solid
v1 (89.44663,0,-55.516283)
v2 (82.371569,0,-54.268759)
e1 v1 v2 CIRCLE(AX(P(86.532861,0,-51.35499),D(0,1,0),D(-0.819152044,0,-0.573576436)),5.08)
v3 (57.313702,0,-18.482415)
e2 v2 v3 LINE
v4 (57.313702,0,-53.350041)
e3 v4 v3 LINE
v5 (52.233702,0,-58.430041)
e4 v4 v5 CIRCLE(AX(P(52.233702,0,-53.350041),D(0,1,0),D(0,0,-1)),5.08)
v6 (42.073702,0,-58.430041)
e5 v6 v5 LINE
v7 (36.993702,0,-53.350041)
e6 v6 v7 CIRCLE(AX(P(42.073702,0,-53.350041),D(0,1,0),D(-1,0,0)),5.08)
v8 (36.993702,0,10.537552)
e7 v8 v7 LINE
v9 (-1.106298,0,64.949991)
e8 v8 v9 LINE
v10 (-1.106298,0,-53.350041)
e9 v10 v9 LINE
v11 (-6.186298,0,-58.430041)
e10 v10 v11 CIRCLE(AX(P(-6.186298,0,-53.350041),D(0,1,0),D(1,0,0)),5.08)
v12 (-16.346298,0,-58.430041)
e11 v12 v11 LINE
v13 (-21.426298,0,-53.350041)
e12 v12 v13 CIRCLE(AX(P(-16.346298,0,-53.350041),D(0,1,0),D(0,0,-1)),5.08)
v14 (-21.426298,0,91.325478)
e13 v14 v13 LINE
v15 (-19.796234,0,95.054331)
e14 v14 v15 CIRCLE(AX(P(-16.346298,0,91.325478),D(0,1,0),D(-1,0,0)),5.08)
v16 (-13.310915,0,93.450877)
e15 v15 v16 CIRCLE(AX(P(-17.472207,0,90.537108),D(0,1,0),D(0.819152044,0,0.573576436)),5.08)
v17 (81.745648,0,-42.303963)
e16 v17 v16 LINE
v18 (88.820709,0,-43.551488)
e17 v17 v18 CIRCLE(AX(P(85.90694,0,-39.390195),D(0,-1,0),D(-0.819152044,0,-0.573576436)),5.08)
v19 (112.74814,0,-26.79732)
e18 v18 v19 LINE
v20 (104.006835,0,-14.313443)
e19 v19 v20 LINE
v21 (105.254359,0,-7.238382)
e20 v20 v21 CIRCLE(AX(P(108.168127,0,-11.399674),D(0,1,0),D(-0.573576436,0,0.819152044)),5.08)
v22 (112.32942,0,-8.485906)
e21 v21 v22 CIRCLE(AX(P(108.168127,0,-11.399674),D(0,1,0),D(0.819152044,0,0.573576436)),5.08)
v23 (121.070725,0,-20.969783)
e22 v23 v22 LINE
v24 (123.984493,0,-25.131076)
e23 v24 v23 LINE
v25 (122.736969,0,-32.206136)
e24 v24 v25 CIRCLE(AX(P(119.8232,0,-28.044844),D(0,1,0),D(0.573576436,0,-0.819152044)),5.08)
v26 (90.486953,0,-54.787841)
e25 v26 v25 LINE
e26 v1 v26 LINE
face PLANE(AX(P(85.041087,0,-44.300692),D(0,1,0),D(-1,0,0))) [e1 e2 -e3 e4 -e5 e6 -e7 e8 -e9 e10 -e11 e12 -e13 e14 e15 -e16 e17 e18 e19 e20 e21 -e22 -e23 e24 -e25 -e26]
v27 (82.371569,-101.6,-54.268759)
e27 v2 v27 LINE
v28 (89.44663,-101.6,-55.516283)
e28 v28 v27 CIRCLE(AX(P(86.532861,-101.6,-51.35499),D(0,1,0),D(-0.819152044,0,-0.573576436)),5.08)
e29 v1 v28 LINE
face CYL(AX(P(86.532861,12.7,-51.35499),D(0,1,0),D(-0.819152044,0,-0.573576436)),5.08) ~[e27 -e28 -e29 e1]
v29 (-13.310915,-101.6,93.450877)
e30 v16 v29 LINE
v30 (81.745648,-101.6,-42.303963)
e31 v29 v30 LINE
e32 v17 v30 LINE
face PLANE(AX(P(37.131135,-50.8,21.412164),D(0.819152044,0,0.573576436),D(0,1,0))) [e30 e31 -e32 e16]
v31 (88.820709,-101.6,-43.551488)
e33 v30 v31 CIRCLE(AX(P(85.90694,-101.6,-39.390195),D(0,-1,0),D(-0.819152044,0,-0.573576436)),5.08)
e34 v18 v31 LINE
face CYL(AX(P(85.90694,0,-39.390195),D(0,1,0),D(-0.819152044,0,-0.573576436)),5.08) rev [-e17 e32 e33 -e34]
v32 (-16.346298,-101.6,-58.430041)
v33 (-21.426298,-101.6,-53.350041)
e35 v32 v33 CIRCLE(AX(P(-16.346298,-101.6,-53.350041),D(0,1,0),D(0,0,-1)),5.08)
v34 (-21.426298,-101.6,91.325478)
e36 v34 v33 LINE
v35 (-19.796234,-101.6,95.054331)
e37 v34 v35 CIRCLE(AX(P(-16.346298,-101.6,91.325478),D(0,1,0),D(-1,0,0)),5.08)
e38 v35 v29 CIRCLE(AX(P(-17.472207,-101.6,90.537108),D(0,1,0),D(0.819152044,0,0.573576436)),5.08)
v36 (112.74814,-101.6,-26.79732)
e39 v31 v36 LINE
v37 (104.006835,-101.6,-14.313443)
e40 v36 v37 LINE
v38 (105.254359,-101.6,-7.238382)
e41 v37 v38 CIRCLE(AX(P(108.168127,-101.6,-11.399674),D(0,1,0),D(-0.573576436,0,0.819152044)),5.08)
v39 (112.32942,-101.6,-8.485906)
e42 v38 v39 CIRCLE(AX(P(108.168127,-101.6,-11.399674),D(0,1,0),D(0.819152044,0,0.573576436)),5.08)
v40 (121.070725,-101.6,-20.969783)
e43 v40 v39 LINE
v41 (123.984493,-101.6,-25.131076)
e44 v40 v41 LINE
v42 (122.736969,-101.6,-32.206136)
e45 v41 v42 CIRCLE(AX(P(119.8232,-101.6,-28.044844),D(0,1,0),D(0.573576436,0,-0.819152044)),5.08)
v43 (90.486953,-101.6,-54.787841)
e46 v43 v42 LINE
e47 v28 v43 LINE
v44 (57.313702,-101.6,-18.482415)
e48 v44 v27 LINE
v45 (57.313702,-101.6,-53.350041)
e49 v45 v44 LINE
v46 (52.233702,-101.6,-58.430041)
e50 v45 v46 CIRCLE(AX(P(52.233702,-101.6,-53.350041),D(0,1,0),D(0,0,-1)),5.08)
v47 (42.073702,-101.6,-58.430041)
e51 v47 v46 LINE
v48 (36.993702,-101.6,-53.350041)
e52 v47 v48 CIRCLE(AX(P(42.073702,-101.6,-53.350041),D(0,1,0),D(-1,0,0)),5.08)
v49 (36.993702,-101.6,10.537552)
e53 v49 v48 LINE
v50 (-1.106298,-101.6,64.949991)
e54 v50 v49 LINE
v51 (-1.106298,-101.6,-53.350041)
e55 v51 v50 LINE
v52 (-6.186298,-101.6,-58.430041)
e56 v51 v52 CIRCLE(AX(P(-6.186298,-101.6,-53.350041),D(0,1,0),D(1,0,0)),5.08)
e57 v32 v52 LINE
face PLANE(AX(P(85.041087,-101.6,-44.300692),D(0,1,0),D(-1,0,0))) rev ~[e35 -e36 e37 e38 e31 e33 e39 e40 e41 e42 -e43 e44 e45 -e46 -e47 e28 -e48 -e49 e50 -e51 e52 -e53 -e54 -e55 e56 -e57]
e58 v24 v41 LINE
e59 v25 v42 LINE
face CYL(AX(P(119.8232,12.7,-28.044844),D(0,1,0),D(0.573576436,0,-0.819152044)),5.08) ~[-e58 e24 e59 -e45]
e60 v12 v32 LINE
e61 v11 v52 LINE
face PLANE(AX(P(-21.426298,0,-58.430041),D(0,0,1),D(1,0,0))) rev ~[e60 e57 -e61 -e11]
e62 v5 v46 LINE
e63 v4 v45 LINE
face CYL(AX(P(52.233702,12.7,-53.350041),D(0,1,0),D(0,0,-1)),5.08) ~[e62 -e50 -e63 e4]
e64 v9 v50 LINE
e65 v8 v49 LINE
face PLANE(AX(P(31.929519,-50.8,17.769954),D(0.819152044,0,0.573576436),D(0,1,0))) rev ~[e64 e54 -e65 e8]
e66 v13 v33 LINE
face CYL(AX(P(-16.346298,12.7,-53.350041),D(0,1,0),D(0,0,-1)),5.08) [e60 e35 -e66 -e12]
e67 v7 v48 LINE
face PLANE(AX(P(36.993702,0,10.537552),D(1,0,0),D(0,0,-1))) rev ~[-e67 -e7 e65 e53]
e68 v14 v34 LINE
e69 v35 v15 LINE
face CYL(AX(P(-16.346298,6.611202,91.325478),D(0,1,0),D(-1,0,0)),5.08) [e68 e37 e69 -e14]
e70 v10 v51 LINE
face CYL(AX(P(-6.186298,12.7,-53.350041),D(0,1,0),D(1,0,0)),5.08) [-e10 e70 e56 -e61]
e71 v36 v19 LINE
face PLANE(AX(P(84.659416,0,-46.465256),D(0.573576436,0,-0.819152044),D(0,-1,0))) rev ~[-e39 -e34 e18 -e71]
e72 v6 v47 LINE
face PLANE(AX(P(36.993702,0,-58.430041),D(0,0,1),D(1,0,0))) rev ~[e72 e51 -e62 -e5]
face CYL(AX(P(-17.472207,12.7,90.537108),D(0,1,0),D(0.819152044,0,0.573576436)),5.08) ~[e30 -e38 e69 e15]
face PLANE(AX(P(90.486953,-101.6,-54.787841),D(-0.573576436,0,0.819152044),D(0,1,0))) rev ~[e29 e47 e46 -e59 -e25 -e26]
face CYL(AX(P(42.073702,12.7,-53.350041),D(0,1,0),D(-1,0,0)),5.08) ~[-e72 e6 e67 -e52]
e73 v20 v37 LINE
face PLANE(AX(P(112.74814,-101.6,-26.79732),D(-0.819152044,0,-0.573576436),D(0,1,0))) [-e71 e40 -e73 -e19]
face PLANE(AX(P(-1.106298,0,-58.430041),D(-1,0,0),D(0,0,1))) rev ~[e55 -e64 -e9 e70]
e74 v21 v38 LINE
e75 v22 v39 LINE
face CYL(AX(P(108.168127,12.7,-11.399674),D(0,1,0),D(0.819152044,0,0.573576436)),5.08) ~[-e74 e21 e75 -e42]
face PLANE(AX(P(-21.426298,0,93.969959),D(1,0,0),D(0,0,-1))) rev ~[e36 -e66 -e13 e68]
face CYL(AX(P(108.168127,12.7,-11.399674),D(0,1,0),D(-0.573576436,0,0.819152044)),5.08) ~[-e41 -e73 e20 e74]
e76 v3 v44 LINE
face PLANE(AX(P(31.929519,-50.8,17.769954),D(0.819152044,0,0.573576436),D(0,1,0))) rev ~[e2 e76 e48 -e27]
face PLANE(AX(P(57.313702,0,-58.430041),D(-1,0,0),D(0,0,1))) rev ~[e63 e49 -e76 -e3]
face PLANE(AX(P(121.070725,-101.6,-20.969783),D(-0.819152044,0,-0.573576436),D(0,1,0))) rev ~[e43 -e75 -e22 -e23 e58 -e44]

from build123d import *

# Parameters (mm, degrees)
F1_DEPTH    = 101.6
F3_DEPTH    = 6.35
F5_DEPTH    = 44.45
F6_W        = 10.16
F6_H        = 101.6
F7_DEPTH    = 20.32
F8_T1_DEPTH = 101.6
F8_T3_DEPTH = 127
F8_T5_DEPTH = 114.822403084
F10_W       = 251.0453239083
F10_H       = 203.9344906807
F11_DEPTH   = 160.782


# Not quite as in the source:
# - a fillet or chamfer that OpenCascade refuses, or shapes differently, is made with other operations: its cross-section is extruded or revolved along the edge and cut away or added


with BuildPart() as f1:
    # F0 (on Front) → F1 (new body)
    with BuildSketch(Plane.XZ):
        Polygon((57.3137016242, -18.4824153282), (36.9937016242, 10.5375521688), (36.9937016242, -58.4300412773), (57.3137016242, -58.4300412773), align=None)
    extrude(amount=F1_DEPTH)



with BuildPart() as f1b:
    # F0 (on Front) → F1, piece 2 (new body)
    with BuildSketch(Plane.XZ):
        Polygon((-1.1062983758, 64.9499912257), (-21.4262983758, 93.9699587227), (-21.4262983758, -58.4300412773), (-1.1062983758, -58.4300412773), align=None)
    extrude(amount=F1_DEPTH)


with BuildPart() as f1_1:
    add(f1.part)

    add(f1b.part)  # F3 merges F1b
    # F2 (on face) → F3 (join)
    with BuildSketch(Plane(origin=(29.774176385, 0, 20.8481027487), x_dir=(0, 1, 0), z_dir=(0.8191520443, 0, 0.5735764364))):
        Polygon((-101.6, 89.265303656), (-101.6, -96.780755544), (0, -96.780755544), (0, 38.465303656), (0, 89.265303656), align=None)
    extrude(amount=F3_DEPTH)

    # F4 (on face) → F5 (join)
    with BuildSketch(Plane(origin=(34.9757918662, 0, 24.4903131196), x_dir=(0, 1, 0), z_dir=(0.8191520443, 0, 0.5735764364))):
        Polygon((-101.6, -86.620755544), (-101.6, -96.780755544), (0, -96.780755544), (0, -86.620755544), (-12.7, -86.620755544), (-88.9, -86.620755544), align=None)
    extrude(amount=F5_DEPTH)

    # F6 (on face) → F7 (join)
    with BuildSketch(Plane(origin=(49.6836242789, 0, -70.9555689817), x_dir=(0.8191520443, 0, 0.5735764364), z_dir=(-0.5735764364, 0, 0.8191520443))):
        with Locations((82.0675579321, -50.8)):
            Rectangle(F6_W, F6_H)
    extrude(amount=F7_DEPTH)

    # F8: fillet of radius 5.08 on 11 edges, made by hand

    # F8_s2 → F8_t1 (join)
    with BuildSketch(Plane.XZ):
        with BuildLine():
            ThreePointArc((81.7456478485, -42.3039634771), (85.0248074909, -44.3930185658), (88.8207085301, -43.5514875655))
            Line((88.8207085301, -43.5514875655), (84.6594161452, -46.4652558621))
            Line((84.6594161452, -46.4652558621), (81.7456478485, -42.3039634771))
        make_face()
    extrude(amount=F8_T1_DEPTH)

    # F8_s4 → F8_t3 (cut)
    with BuildSketch(Plane.XZ.offset(-12.7)):
        with BuildLine():
            ThreePointArc((112.3294196238, -8.4859061114), (109.0502599814, -6.3968510227), (105.2543589422, -7.238382023))
            Line((105.2543589422, -7.238382023), (109.4156513272, -4.3246137264))
            Line((109.4156513272, -4.3246137264), (112.3294196238, -8.4859061114))
        make_face()
        with BuildLine():
            ThreePointArc((122.7369687221, -32.206136333), (124.8260238108, -28.9269766905), (123.9844928105, -25.1310756513))
            Line((123.9844928105, -25.1310756513), (126.8982611071, -29.2923680363))
            Line((126.8982611071, -29.2923680363), (122.7369687221, -32.206136333))
        make_face()
        with BuildLine():
            ThreePointArc((105.2543589422, -7.238382023), (103.1653038535, -10.5175416655), (104.0068348538, -14.3134427047))
            Line((104.0068348538, -14.3134427047), (101.0930665572, -10.1521503197))
            Line((101.0930665572, -10.1521503197), (105.2543589422, -7.238382023))
        make_face()
        with BuildLine():
            ThreePointArc((-13.3109145979, 93.4508767085), (-16.5900742404, 95.5399317971), (-20.3859752796, 94.6984007968))
            Line((-20.3859752796, 94.6984007968), (-16.2246828946, 97.6121690935))
            Line((-16.2246828946, 97.6121690935), (-13.3109145979, 93.4508767085))
        make_face()
        with BuildLine():
            ThreePointArc((82.3715689606, -54.2687586179), (85.650728603, -56.3578137066), (89.4466296422, -55.5162827063))
            Line((89.4466296422, -55.5162827063), (85.2853372573, -58.4300510029))
            Line((85.2853372573, -58.4300510029), (82.3715689606, -54.2687586179))
        make_face()
        with BuildLine():
            ThreePointArc((-16.3462983758, -58.4300412773), (-19.9384008243, -56.9421437258), (-21.4262983758, -53.3500412773))
            Line((-21.4262983758, -53.3500412773), (-21.4262983758, -58.4300412773))
            Line((-21.4262983758, -58.4300412773), (-16.3462983758, -58.4300412773))
        make_face()
        with BuildLine():
            ThreePointArc((-1.1062983758, -53.3500412773), (-2.5941959274, -56.9421437258), (-6.1862983758, -58.4300412773))
            Line((-6.1862983758, -58.4300412773), (-1.1062983758, -58.4300412773))
            Line((-1.1062983758, -58.4300412773), (-1.1062983758, -53.3500412773))
        make_face()
        with BuildLine():
            ThreePointArc((36.9937016242, -53.3500412773), (38.4815991757, -56.9421437258), (42.0737016242, -58.4300412773))
            Line((42.0737016242, -58.4300412773), (36.9937016242, -58.4300412773))
            Line((36.9937016242, -58.4300412773), (36.9937016242, -53.3500412773))
        make_face()
        with BuildLine():
            ThreePointArc((52.2337016242, -58.4300412773), (55.8258040726, -56.9421437258), (57.3137016242, -53.3500412773))
            Line((57.3137016242, -53.3500412773), (57.3137016242, -58.4300412773))
            Line((57.3137016242, -58.4300412773), (52.2337016242, -58.4300412773))
        make_face()
    extrude(amount=F8_T3_DEPTH, mode=Mode.SUBTRACT)

    # F8_s6 → F8_t5 (cut)
    with BuildSketch(Plane.XZ.offset(-6.611201542)):
        with BuildLine():
            ThreePointArc((-21.4262983758, 91.3254781059), (-20.8523134084, 93.6711610611), (-19.2600666725, 95.4867704908))
            Line((-19.2600666725, 95.4867704908), (-21.4262983758, 93.9699587227))
            Line((-21.4262983758, 93.9699587227), (-21.4262983758, 91.3254781059))
        make_face()
    extrude(amount=F8_T5_DEPTH, mode=Mode.SUBTRACT)


with BuildPart() as f9_1:
    # F9: copy of F1
    add(f1_1.part.moved(Location((0, 169.418, 0))))

    # F10 (on face) → F11 (cut)
    with BuildSketch(Plane.XZ.offset(-67.818)):
        with Locations((60.7606135309, 16.4267346263)):
            Rectangle(F10_W, F10_H)
    extrude(amount=-F11_DEPTH, mode=Mode.SUBTRACT)


solid = f1_1.part
